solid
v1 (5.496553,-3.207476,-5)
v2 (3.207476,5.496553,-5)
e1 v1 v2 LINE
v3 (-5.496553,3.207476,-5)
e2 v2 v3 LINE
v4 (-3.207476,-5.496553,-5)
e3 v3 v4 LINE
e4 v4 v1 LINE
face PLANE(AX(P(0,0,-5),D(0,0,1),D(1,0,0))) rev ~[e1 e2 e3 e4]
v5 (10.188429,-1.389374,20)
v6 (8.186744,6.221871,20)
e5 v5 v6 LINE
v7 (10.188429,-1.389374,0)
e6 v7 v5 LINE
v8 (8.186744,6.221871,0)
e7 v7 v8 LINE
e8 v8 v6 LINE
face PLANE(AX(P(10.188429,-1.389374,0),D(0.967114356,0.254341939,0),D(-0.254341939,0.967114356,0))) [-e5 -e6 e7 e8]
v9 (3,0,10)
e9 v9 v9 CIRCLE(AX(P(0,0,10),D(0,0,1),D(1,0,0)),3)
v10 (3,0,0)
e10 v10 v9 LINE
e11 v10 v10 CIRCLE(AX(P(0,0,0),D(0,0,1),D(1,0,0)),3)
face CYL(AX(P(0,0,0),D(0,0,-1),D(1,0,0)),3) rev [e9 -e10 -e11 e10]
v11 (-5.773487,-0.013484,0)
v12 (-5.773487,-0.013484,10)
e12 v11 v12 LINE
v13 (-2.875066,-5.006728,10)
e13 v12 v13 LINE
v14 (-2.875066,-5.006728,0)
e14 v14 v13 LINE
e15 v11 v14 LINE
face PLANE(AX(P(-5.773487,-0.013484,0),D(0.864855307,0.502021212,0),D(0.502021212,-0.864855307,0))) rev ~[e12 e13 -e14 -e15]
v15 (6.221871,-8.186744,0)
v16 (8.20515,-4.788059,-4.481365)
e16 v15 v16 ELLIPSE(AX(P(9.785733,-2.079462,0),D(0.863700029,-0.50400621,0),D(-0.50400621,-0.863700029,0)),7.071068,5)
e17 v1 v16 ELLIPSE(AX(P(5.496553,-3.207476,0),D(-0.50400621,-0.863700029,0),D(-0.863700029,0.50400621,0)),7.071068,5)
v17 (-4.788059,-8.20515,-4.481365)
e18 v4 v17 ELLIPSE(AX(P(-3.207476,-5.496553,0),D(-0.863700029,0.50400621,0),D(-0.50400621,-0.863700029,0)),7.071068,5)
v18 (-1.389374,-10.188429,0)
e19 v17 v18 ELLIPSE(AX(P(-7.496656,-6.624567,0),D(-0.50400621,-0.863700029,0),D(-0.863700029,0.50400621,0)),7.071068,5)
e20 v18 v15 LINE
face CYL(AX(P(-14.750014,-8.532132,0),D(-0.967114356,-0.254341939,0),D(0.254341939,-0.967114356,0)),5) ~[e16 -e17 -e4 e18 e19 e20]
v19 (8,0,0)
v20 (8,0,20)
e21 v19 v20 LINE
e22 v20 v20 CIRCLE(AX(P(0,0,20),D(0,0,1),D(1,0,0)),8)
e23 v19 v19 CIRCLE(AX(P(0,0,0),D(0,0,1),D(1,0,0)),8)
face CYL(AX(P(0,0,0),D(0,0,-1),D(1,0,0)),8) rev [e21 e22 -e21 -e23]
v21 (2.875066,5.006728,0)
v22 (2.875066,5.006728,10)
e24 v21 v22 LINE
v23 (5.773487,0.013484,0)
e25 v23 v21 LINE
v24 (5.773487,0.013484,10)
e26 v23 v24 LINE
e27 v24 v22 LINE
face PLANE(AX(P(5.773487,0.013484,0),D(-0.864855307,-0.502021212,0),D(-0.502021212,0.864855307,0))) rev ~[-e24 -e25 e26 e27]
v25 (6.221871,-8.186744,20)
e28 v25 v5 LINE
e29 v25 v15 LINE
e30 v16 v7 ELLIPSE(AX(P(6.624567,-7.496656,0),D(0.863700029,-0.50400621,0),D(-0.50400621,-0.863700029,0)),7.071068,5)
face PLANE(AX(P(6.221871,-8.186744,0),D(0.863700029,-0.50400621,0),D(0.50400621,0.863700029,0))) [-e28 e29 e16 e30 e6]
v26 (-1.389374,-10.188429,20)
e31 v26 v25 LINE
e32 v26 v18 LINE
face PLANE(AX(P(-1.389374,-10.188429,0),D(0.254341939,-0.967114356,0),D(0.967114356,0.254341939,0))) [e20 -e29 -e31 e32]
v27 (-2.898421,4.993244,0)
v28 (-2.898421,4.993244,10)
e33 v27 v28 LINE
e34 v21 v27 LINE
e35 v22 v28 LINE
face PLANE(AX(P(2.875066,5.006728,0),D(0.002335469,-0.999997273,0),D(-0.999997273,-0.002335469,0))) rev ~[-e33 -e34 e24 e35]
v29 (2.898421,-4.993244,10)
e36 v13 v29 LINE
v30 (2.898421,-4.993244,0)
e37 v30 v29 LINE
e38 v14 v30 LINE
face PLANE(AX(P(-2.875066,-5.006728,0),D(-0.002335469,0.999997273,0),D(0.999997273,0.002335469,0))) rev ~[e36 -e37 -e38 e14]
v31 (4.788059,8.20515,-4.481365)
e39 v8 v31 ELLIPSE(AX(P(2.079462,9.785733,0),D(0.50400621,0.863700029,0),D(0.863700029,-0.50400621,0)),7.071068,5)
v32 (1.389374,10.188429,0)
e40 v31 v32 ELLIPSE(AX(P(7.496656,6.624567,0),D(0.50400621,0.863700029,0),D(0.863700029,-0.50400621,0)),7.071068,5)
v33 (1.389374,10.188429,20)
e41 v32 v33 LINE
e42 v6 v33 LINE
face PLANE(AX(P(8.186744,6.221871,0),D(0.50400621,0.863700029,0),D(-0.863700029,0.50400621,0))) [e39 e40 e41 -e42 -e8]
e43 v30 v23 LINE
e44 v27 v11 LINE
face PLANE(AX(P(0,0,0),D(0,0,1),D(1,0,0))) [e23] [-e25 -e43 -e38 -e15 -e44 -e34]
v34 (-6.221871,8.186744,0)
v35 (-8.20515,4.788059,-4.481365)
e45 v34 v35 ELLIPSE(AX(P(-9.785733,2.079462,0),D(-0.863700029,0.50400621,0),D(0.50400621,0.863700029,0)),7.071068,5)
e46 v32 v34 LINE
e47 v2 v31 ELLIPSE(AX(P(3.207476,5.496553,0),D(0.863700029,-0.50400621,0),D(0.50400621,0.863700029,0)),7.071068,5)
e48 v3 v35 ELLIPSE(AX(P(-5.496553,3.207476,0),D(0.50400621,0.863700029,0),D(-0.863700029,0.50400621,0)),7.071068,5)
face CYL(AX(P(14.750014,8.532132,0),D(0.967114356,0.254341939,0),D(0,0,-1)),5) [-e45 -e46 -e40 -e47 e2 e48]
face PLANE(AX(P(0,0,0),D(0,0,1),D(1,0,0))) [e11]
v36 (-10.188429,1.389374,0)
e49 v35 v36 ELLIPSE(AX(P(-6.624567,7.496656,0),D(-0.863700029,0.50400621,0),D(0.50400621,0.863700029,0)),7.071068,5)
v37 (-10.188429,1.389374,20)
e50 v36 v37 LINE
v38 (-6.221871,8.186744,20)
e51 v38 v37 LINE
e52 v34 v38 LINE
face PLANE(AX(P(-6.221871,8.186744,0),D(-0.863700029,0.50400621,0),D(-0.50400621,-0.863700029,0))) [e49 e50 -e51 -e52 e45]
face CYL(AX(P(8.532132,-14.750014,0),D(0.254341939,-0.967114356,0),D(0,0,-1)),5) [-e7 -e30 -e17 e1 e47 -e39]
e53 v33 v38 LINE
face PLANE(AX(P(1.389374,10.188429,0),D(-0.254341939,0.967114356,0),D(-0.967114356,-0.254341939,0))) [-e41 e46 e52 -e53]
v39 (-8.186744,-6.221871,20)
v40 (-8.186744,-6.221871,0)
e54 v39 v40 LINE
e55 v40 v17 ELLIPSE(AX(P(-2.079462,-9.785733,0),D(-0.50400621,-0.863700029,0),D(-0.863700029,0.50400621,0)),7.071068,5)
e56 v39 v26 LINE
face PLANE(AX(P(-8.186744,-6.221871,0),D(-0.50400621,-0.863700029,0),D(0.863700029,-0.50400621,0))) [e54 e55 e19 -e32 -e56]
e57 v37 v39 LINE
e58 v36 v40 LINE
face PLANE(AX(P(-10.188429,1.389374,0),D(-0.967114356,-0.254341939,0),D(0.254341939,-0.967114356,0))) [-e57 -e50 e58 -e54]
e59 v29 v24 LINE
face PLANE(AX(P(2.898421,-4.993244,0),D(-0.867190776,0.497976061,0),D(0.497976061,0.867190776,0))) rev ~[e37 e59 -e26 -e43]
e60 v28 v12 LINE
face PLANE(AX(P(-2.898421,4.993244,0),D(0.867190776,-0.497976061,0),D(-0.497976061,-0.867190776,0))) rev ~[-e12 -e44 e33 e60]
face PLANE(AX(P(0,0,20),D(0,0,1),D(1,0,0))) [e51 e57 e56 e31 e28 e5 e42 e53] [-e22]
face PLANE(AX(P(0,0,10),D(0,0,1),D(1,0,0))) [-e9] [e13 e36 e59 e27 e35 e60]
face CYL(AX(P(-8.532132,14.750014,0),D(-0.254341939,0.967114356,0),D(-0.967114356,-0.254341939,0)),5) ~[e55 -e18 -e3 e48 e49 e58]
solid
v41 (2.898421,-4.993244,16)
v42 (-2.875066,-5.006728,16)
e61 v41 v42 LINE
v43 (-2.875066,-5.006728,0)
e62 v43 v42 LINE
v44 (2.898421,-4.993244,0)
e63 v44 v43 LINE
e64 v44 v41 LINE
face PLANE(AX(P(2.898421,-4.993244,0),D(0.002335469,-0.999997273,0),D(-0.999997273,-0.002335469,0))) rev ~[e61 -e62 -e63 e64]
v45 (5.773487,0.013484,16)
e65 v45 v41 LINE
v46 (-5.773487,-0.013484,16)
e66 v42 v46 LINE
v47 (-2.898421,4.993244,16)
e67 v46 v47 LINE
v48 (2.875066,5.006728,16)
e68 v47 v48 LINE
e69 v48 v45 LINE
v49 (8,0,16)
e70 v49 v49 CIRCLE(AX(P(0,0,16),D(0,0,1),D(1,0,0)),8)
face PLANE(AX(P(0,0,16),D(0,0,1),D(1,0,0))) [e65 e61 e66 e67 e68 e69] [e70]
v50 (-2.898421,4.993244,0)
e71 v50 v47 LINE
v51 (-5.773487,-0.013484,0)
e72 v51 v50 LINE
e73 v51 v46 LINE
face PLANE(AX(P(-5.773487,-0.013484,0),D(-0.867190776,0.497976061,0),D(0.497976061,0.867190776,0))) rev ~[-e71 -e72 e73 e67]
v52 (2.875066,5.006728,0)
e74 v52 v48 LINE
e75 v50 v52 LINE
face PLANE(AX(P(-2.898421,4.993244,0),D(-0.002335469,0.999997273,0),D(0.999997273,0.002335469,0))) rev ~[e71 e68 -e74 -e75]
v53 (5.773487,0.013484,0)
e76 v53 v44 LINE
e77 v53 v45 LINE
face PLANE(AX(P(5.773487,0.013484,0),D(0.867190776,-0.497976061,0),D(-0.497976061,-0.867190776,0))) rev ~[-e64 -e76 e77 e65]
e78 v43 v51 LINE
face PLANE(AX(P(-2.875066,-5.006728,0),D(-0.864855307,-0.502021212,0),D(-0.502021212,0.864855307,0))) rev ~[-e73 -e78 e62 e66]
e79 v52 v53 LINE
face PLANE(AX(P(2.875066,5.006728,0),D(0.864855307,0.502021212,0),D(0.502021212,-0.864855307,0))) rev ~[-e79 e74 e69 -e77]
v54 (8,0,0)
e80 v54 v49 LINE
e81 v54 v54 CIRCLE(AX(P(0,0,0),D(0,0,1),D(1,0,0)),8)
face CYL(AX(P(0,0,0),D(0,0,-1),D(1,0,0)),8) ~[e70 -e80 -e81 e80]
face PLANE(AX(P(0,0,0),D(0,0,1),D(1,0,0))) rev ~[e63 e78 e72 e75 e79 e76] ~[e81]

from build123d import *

# Parameters (mm, degrees)
F0_R        = 8
F1_DEPTH    = 20
F0_R_2      = 3
F2_DEPTH    = 5
F3_DEPTH    = 10
F4_DEPTH    = 16
F5_T1_DEPTH = 32.8700576851
F5_T3_DEPTH = 32.8700576851
F5_T5_DEPTH = 32.8700576851
F5_T7_DEPTH = 32.8700576851


# Not quite as in the source:
# - a fillet or chamfer that OpenCascade refuses, or shapes differently, is made with other operations: its cross-section is extruded or revolved along the edge and cut away or added


with BuildPart() as f1:
    # F0 (on Top) → F1 (new body)
    with BuildSketch(Plane.XY):
        Polygon((6.2218713056, -8.1867435191), (10.1884292501, -1.3893744663), (8.1867435191, 6.2218713056), (1.3893744663, 10.1884292501), (-6.2218713056, 8.1867435191), (-10.1884292501, 1.3893744663), (-8.1867435191, -6.2218713056), (-1.3893744663, -10.1884292501), align=None)
        Circle(F0_R, mode=Mode.SUBTRACT)
    extrude(amount=F1_DEPTH)

    # F0 (on Top) → F2 (join)
    with BuildSketch(Plane.XY):
        Polygon((6.2218713056, -8.1867435191), (10.1884292501, -1.3893744663), (8.1867435191, 6.2218713056), (1.3893744663, 10.1884292501), (-6.2218713056, 8.1867435191), (-10.1884292501, 1.3893744663), (-8.1867435191, -6.2218713056), (-1.3893744663, -10.1884292501), align=None)
        Circle(F0_R, mode=Mode.SUBTRACT)
        Circle(F0_R)
        Polygon((-2.8984208181, 4.9932444457), (2.8750661283, 5.0067282822), (5.7734869463, 0.0134838364), (2.8984208181, -4.9932444457), (-2.8750661283, -5.0067282822), (-5.7734869463, -0.0134838364), align=None, mode=Mode.SUBTRACT)
        Polygon((5.7734869463, 0.0134838364), (2.8750661283, 5.0067282822), (-2.8984208181, 4.9932444457), (-5.7734869463, -0.0134838364), (-2.8750661283, -5.0067282822), (2.8984208181, -4.9932444457), align=None)
        Circle(F0_R_2, mode=Mode.SUBTRACT)
        Circle(F0_R_2)
    extrude(amount=-F2_DEPTH)

    # F0 (on Top) → F3 (join)
    with BuildSketch(Plane.XY):
        Polygon((5.7734869463, 0.0134838364), (2.8750661283, 5.0067282822), (-2.8984208181, 4.9932444457), (-5.7734869463, -0.0134838364), (-2.8750661283, -5.0067282822), (2.8984208181, -4.9932444457), align=None)
        Circle(F0_R_2, mode=Mode.SUBTRACT)
    extrude(amount=F3_DEPTH)

    # F5: fillet of radius 5 on 4 edges, made by hand

    # F5_s2 → F5_t1 (cut)
    with BuildSketch(Plane(origin=(-15.8945523394, -4.1801171018, 0), x_dir=(0, 0, 1), z_dir=(0.9671143563, 0.2543419389, 0))):
        with BuildLine():
            ThreePointArc((0, 9.5), (-3.5355339059, 8.0355339059), (-5, 4.5))
            Line((-5, 4.5), (-5, 9.5))
            Line((-5, 9.5), (0, 9.5))
        make_face()
    extrude(amount=F5_T1_DEPTH, mode=Mode.SUBTRACT)

    # F5_s4 → F5_t3 (cut)
    with BuildSketch(Plane(origin=(-4.1801171018, 15.8945523394, 0), x_dir=(0, 0, 1), z_dir=(0.2543419389, -0.9671143563, 0))):
        with BuildLine():
            ThreePointArc((0, 9.5), (-3.5355339059, 8.0355339059), (-5, 4.5))
            Line((-5, 4.5), (-5, 9.5))
            Line((-5, 9.5), (0, 9.5))
        make_face()
    extrude(amount=F5_T3_DEPTH, mode=Mode.SUBTRACT)

    # F5_s6 → F5_t5 (cut)
    with BuildSketch(Plane(origin=(15.8945523394, 4.1801171018, 0), x_dir=(0, 0, 1), z_dir=(-0.9671143563, -0.2543419389, 0))):
        with BuildLine():
            ThreePointArc((-5, 4.5), (-3.5355339059, 8.0355339059), (0, 9.5))
            Line((0, 9.5), (-5, 9.5))
            Line((-5, 9.5), (-5, 4.5))
        make_face()
    extrude(amount=F5_T5_DEPTH, mode=Mode.SUBTRACT)

    # F5_s8 → F5_t7 (cut)
    with BuildSketch(Plane(origin=(4.1801171018, -15.8945523394, 0), x_dir=(0, 0, 1), z_dir=(-0.2543419389, 0.9671143563, 0))):
        with BuildLine():
            ThreePointArc((-5, 4.5), (-3.5355339059, 8.0355339059), (0, 9.5))
            Line((0, 9.5), (-5, 9.5))
            Line((-5, 9.5), (-5, 4.5))
        make_face()
    extrude(amount=F5_T7_DEPTH, mode=Mode.SUBTRACT)


with BuildPart() as f4:
    # F0 (on Top) → F4 (new body)
    with BuildSketch(Plane.XY):
        Circle(F0_R)
        Polygon((-2.8984208181, 4.9932444457), (2.8750661283, 5.0067282822), (5.7734869463, 0.0134838364), (2.8984208181, -4.9932444457), (-2.8750661283, -5.0067282822), (-5.7734869463, -0.0134838364), align=None, mode=Mode.SUBTRACT)
    extrude(amount=F4_DEPTH)


solid = Compound([f1.part, f4.part])
